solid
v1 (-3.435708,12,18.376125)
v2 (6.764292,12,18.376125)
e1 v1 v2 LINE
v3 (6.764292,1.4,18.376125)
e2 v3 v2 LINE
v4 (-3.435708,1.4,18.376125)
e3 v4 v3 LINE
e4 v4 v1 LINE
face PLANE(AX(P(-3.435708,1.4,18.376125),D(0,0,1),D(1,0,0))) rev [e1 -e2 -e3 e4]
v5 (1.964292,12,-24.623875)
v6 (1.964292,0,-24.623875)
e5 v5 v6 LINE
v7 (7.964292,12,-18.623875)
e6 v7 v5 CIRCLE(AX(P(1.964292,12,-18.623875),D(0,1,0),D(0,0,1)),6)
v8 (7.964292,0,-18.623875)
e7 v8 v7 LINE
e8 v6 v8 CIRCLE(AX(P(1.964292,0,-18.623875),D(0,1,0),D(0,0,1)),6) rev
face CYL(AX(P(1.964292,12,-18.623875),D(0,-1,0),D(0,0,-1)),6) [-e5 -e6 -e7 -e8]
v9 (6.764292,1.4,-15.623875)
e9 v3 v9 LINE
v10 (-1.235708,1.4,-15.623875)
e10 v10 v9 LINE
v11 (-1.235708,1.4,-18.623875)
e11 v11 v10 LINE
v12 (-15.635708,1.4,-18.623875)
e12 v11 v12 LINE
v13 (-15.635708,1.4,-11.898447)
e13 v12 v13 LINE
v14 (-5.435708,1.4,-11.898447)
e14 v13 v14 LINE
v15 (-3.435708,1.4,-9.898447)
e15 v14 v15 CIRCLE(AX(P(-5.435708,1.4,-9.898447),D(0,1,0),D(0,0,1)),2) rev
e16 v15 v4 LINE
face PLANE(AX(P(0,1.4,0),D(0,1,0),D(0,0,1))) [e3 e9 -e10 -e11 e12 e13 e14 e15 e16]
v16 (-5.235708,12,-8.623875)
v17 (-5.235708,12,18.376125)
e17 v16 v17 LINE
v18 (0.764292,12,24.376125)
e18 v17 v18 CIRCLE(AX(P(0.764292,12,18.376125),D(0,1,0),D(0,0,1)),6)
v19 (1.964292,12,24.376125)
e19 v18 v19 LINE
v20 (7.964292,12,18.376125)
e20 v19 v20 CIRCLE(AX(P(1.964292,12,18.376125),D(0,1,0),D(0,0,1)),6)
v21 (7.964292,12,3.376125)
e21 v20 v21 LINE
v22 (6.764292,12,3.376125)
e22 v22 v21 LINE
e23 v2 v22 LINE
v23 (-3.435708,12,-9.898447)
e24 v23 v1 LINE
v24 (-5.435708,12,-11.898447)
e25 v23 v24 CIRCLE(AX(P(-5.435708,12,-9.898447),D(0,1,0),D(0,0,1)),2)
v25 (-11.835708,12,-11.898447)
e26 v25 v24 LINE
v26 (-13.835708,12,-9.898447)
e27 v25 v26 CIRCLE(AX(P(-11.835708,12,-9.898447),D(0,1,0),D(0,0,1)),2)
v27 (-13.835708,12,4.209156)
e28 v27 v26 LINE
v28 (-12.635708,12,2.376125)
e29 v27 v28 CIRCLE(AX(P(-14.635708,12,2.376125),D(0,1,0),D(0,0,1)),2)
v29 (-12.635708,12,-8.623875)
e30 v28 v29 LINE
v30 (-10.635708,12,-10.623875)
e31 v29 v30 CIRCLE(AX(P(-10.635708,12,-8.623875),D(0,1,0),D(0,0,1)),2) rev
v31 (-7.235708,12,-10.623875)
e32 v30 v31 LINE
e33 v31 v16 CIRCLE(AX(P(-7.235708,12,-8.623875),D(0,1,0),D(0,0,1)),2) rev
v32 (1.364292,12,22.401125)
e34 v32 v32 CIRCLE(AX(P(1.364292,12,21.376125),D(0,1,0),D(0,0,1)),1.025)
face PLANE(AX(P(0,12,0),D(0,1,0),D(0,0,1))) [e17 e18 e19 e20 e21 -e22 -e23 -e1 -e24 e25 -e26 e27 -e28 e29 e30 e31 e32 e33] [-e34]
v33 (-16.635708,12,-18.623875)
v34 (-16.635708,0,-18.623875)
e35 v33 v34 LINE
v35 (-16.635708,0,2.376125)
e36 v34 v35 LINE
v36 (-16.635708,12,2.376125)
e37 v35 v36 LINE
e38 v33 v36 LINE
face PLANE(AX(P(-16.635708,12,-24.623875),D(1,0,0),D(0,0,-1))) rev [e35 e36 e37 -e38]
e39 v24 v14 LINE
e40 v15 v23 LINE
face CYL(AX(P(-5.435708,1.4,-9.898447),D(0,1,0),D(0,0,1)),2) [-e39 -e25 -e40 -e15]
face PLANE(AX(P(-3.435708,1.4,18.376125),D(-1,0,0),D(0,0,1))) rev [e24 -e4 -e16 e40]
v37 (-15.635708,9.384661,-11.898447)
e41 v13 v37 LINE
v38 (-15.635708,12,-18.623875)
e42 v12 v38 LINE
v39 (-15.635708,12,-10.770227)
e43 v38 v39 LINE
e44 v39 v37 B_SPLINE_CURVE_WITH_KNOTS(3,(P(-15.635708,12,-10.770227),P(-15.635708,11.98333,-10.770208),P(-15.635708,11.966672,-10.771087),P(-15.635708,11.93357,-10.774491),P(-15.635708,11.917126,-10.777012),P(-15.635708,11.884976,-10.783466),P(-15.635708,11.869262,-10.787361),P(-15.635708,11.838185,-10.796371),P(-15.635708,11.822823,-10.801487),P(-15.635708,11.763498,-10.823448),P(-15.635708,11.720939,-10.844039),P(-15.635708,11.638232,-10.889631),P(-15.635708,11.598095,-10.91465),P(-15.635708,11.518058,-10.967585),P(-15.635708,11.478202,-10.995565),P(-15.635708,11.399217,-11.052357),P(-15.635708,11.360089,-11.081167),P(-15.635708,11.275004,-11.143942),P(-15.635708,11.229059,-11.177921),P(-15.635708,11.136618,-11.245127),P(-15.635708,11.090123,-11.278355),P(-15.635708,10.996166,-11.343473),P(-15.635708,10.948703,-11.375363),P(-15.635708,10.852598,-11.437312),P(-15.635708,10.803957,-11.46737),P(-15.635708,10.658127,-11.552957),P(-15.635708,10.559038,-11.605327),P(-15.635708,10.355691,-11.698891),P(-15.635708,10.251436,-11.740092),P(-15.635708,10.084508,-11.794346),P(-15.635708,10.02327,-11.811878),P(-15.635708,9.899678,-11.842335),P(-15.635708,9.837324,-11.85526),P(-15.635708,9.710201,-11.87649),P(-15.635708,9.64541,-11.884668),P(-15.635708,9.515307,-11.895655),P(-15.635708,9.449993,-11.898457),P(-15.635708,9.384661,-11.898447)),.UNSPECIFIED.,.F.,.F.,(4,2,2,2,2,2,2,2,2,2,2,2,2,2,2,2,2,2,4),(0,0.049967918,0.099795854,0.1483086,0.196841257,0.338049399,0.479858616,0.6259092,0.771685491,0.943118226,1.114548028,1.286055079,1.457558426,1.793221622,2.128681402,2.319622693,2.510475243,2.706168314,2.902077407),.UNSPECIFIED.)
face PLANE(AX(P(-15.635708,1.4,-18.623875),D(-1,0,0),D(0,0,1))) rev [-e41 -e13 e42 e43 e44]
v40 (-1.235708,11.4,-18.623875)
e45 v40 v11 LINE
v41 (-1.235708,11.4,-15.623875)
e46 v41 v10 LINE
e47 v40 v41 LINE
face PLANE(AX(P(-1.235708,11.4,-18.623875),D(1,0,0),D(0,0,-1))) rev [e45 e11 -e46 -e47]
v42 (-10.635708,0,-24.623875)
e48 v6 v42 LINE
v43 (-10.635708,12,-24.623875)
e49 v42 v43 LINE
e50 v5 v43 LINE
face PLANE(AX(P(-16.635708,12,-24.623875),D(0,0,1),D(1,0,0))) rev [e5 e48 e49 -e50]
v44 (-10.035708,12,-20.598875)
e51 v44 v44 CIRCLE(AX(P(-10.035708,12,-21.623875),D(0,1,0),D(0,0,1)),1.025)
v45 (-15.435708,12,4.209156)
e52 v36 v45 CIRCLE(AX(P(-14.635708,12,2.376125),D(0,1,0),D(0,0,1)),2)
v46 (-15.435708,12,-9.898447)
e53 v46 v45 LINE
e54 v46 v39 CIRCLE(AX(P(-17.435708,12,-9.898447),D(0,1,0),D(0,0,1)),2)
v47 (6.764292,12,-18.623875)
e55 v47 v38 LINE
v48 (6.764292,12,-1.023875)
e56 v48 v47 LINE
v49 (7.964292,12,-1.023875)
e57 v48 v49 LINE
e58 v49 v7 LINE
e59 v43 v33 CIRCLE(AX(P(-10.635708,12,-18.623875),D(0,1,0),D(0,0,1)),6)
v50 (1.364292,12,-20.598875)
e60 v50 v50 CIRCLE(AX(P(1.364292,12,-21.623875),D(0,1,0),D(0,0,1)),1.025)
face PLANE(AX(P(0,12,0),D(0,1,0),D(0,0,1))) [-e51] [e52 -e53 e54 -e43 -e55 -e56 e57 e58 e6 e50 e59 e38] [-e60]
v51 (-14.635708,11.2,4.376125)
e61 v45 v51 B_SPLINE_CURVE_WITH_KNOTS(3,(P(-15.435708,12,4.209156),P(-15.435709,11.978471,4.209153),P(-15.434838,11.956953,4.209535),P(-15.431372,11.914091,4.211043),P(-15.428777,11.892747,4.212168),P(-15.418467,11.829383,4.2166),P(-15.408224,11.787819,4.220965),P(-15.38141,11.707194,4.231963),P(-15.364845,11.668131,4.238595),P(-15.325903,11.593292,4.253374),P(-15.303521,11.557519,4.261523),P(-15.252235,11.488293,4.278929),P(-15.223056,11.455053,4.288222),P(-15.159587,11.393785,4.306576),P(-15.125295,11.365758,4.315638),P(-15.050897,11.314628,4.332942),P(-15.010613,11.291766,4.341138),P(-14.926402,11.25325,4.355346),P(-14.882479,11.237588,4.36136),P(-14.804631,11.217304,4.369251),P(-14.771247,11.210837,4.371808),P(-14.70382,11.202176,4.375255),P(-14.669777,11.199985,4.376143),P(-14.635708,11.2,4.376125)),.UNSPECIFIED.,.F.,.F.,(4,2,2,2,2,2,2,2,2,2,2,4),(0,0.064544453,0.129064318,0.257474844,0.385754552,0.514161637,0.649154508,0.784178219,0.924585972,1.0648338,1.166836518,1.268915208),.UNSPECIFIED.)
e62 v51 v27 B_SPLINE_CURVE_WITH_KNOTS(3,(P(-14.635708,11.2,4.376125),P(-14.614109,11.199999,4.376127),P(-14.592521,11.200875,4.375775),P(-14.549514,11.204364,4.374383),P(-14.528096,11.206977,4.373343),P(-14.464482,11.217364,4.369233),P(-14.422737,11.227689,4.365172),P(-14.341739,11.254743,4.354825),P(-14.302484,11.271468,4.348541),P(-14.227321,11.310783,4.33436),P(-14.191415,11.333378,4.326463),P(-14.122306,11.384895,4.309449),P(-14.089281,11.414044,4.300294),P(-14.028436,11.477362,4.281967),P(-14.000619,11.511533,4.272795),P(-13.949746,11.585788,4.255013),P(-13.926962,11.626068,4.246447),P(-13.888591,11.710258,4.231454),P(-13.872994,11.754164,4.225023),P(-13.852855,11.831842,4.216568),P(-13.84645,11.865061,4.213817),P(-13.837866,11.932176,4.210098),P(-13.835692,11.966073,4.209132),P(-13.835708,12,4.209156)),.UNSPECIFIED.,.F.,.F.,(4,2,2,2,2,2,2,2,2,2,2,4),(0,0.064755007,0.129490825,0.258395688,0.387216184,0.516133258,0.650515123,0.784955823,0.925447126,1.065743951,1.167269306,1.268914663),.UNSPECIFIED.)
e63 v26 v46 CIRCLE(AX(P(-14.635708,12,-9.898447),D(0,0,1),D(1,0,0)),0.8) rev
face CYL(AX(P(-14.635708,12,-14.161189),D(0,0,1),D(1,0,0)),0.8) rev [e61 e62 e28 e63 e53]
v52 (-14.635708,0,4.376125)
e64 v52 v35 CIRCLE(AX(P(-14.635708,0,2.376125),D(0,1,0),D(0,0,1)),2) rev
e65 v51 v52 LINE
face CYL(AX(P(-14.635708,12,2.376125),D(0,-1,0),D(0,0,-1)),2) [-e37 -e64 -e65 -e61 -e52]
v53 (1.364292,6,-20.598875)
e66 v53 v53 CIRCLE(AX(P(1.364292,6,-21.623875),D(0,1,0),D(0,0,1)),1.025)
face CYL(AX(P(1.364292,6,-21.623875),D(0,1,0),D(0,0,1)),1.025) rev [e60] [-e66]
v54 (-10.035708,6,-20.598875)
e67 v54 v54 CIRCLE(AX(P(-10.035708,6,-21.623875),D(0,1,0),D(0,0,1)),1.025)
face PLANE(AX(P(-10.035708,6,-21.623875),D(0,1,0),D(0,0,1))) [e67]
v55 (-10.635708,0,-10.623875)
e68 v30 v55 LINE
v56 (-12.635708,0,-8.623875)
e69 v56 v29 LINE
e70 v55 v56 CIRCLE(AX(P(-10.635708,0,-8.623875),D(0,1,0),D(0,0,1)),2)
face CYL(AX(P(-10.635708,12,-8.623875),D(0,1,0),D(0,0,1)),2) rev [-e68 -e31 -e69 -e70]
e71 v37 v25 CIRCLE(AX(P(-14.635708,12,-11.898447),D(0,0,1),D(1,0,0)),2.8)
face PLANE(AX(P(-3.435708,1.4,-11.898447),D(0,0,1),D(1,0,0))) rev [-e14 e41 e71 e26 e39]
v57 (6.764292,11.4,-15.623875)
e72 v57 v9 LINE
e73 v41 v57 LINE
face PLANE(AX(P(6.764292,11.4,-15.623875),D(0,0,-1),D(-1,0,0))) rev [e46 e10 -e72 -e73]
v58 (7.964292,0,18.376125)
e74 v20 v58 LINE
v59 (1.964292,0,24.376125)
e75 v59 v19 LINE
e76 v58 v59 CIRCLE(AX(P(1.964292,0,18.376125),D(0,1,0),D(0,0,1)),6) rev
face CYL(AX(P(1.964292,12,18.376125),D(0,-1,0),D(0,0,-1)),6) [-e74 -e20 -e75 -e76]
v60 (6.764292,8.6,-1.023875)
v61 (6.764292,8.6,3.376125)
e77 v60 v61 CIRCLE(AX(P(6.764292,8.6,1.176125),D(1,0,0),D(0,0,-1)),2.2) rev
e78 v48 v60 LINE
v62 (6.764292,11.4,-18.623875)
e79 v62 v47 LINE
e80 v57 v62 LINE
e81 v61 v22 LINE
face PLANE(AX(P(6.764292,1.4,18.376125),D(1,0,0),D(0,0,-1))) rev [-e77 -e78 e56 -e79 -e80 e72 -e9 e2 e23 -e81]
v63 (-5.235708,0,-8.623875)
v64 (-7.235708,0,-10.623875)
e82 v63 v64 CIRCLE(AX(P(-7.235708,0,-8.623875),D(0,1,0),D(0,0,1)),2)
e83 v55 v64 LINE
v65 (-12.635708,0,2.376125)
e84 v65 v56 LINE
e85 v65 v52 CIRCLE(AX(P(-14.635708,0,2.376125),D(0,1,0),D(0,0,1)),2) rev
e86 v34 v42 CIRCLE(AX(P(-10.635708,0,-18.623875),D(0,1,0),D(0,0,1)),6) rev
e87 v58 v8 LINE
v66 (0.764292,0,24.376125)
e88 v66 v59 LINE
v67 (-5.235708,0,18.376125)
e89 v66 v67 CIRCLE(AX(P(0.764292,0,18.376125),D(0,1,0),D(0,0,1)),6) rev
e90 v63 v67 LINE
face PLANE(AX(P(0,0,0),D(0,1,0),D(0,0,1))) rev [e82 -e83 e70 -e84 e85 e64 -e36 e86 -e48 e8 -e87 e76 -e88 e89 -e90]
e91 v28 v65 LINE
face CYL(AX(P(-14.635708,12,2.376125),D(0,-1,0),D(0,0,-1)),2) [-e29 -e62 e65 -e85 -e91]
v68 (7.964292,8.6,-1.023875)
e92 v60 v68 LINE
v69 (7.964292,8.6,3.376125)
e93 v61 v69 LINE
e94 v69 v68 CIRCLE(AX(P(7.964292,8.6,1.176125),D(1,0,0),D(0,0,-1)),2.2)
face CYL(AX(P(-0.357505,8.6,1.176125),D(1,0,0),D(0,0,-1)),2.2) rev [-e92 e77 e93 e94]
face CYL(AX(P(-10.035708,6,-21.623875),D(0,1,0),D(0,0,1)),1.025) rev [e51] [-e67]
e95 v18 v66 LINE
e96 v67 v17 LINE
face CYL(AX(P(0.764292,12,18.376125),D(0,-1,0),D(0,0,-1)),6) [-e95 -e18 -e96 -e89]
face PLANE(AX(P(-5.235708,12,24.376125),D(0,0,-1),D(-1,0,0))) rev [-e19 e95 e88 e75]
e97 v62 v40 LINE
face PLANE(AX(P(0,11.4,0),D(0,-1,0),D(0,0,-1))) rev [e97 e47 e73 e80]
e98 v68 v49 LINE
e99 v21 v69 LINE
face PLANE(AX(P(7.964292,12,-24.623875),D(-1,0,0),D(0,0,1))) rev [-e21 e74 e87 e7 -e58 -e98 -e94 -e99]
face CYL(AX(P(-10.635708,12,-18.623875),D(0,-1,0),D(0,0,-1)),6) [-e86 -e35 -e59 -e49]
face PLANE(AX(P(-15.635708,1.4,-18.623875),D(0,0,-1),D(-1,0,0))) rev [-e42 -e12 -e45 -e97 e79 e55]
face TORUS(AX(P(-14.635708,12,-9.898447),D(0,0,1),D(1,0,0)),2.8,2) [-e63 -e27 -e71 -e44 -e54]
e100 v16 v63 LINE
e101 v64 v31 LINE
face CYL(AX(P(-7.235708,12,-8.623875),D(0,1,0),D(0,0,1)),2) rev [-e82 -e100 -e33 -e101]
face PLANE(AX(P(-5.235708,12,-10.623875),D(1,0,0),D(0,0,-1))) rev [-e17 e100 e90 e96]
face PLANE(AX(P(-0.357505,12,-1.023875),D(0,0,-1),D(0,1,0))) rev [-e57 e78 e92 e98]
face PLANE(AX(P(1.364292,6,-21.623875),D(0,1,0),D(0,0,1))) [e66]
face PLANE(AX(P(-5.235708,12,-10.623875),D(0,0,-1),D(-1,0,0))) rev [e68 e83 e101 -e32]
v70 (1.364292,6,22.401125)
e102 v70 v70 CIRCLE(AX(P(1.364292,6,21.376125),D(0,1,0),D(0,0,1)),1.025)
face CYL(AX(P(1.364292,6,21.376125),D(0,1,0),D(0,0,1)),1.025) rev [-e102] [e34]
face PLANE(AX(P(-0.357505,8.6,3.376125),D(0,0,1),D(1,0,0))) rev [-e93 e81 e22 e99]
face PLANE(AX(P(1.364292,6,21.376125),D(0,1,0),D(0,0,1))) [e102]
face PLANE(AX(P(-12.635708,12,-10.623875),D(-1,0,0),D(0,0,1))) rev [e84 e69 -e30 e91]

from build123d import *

# Parameters (mm, degrees)
BOSS_EXTRUDE1_DEPTH = 12
CUT_EXTRUDE1_DEPTH  = 10.6
SKETCH3_R           = 0.8
CUT_EXTRUDE2_DEPTH  = 16.274572476
SKETCH4_R           = 1.025
CUT_EXTRUDE3_DEPTH  = 6
FILLET1_R           = 6
FILLET2_R           = 2
CUT_EXTRUDE4_DEPTH  = 1.2
FILLET3_R           = 2
SKETCH6_W           = 8
SKETCH6_H           = 3
BOSS_EXTRUDE2_DEPTH = 10


# Some blends are built 0.0001 mm under size
with BuildPart() as part:
    # Sketch1 → Boss-Extrude1 (new body)
    with BuildSketch(Plane(origin=(0, 0, 0), x_dir=(1, 0, 0), z_dir=(0, 1, 0))):
        Polygon((-16.635707691, 24.623874564), (7.964292309, 24.623874564), (7.964292309, -24.376125436), (-5.235707691, -24.376125436), (-5.235707691, 10.623874564), (-12.635707691, 10.623874564), (-12.635707691, -4.376125436), (-16.635707691, -4.376125436), align=None)
    extrude(amount=BOSS_EXTRUDE1_DEPTH)

    # Sketch2 → Cut-Extrude1 (cut)
    with BuildSketch(Plane(origin=(0, 12, 0), x_dir=(1, 0, 0), z_dir=(0, 1, 0))):
        Polygon((-3.435707691, -18.376125436), (6.764292309, -18.376125436), (6.764292309, 18.623874564), (-15.635707691, 18.623874564), (-15.635707691, 11.89844704), (-3.435707691, 11.89844704), align=None)
    extrude(amount=-CUT_EXTRUDE1_DEPTH, mode=Mode.SUBTRACT)

    # Sketch3 → Cut-Extrude2 (cut)
    with BuildSketch(Plane.XY.offset(4.376125436)):
        with Locations((-14.635707691, 12)):
            Circle(SKETCH3_R)
    extrude(amount=-CUT_EXTRUDE2_DEPTH, mode=Mode.SUBTRACT)

    # Sketch4 → Cut-Extrude3 (cut)
    with BuildSketch(Plane(origin=(0, 12, 0), x_dir=(1, 0, 0), z_dir=(0, 1, 0))):
        with Locations(Location((-10.035707691, 21.623874564, 0), (0, 0, 270))):
            Circle(SKETCH4_R)
        with Locations(Location((1.364292309, 21.623874564, 0), (0, 0, 270))):
            Circle(SKETCH4_R)
        with Locations(Location((1.364292309, -21.376125436, 0), (0, 0, 270))):
            Circle(SKETCH4_R)
    extrude(amount=-CUT_EXTRUDE3_DEPTH, mode=Mode.SUBTRACT)

    # Fillet1
    fillet1_edges = [part.edges().sort_by_distance(p)[0] for p in [
        (-16.635707691, 6, -24.623874564),
        (7.964292309, 6, -24.623874564),
        (7.964292309, 6, 24.376125436),
        (-5.235707691, 6, 24.376125436),
    ]]
    fillet(fillet1_edges, radius=FILLET1_R)

    # Fillet2
    fillet2_edges = [part.edges().sort_by_distance(p)[0] for p in [
        (-5.235707691, 6, -10.623874564),
        (-12.635707691, 6, -10.623874564),
        (-12.635707691, 6, 4.376125436),
        (-16.635707691, 6, 4.376125436),
    ]]
    fillet(fillet2_edges, radius=FILLET2_R - 0.0001)  # a hair under: the kernel refuses the full size

    # Sketch5 → Cut-Extrude4 (cut)
    with BuildSketch(Plane(origin=(7.964292309, 0, 0), x_dir=(0, 0, -1), z_dir=(1, 0, 0))):
        with BuildLine():
            Line((-3.376125436, 8.6), (-3.376125436, 12))
            Line((-3.376125436, 12), (1.023874564, 12))
            Line((1.023874564, 12), (1.023874564, 8.6))
            ThreePointArc((1.023874564, 8.6), (-1.176125436, 6.4), (-3.376125436, 8.6))
        make_face()
    extrude(amount=-CUT_EXTRUDE4_DEPTH, mode=Mode.SUBTRACT)

    # Fillet3
    # the kernel refuses this fillet: 2 mm, written as the material it takes off along each edge
    with BuildSketch(Plane(origin=(-3.435707691, 17, -11.89844704), x_dir=(-1, 0, 0), z_dir=(0, -1, 0))) as fillet3_piece_1:
        with BuildLine():
            CenterArc((FILLET3_R, -FILLET3_R), FILLET3_R, 90, 90)
            Line((0, -FILLET3_R), (0, 0))
            Line((0, 0), (FILLET3_R, 0))
        make_face()
    extrude(amount=15.6, mode=Mode.SUBTRACT)
    with BuildSketch(Plane(origin=(-14.635707691, 12, -11.89844704), x_dir=(-0.0031415874858797778, 0.9999950652018582, 0), z_dir=(0.9999950652018582, 0.0031415874858797778, 0))) as fillet3_piece_2_section:
        with BuildLine():
            CenterArc((0.8 + FILLET3_R, 0 + FILLET3_R), FILLET3_R, 180, 90)
            Line((0.8 + FILLET3_R, 0), (0.8, 0))
            Line((0.8, 0), (0.8, 0 + FILLET3_R))
        make_face()
    fillet3_piece_2 = revolve(axis=Axis((-14.635707691, 12, -11.89844704), (0, 0, 1)), revolution_arc=359.64, mode=Mode.PRIVATE)
    fillet3_piece_2 = split(fillet3_piece_2, bisect_by=Plane(origin=(-15.635707691, 11.089592245, -11.483446459), z_dir=(1, 0, 0)), keep=Keep.TOP, mode=Mode.PRIVATE)
    add(fillet3_piece_2, mode=Mode.SUBTRACT)

    # Sketch6 → Boss-Extrude2 (add)
    with BuildSketch(Plane(origin=(0, 1.4, 0), x_dir=(1, 0, 0), z_dir=(0, 1, 0))):
        with Locations((2.764292309, 17.123874564)):
            Rectangle(SKETCH6_W, SKETCH6_H)
    extrude(amount=BOSS_EXTRUDE2_DEPTH)


solid = part.part
